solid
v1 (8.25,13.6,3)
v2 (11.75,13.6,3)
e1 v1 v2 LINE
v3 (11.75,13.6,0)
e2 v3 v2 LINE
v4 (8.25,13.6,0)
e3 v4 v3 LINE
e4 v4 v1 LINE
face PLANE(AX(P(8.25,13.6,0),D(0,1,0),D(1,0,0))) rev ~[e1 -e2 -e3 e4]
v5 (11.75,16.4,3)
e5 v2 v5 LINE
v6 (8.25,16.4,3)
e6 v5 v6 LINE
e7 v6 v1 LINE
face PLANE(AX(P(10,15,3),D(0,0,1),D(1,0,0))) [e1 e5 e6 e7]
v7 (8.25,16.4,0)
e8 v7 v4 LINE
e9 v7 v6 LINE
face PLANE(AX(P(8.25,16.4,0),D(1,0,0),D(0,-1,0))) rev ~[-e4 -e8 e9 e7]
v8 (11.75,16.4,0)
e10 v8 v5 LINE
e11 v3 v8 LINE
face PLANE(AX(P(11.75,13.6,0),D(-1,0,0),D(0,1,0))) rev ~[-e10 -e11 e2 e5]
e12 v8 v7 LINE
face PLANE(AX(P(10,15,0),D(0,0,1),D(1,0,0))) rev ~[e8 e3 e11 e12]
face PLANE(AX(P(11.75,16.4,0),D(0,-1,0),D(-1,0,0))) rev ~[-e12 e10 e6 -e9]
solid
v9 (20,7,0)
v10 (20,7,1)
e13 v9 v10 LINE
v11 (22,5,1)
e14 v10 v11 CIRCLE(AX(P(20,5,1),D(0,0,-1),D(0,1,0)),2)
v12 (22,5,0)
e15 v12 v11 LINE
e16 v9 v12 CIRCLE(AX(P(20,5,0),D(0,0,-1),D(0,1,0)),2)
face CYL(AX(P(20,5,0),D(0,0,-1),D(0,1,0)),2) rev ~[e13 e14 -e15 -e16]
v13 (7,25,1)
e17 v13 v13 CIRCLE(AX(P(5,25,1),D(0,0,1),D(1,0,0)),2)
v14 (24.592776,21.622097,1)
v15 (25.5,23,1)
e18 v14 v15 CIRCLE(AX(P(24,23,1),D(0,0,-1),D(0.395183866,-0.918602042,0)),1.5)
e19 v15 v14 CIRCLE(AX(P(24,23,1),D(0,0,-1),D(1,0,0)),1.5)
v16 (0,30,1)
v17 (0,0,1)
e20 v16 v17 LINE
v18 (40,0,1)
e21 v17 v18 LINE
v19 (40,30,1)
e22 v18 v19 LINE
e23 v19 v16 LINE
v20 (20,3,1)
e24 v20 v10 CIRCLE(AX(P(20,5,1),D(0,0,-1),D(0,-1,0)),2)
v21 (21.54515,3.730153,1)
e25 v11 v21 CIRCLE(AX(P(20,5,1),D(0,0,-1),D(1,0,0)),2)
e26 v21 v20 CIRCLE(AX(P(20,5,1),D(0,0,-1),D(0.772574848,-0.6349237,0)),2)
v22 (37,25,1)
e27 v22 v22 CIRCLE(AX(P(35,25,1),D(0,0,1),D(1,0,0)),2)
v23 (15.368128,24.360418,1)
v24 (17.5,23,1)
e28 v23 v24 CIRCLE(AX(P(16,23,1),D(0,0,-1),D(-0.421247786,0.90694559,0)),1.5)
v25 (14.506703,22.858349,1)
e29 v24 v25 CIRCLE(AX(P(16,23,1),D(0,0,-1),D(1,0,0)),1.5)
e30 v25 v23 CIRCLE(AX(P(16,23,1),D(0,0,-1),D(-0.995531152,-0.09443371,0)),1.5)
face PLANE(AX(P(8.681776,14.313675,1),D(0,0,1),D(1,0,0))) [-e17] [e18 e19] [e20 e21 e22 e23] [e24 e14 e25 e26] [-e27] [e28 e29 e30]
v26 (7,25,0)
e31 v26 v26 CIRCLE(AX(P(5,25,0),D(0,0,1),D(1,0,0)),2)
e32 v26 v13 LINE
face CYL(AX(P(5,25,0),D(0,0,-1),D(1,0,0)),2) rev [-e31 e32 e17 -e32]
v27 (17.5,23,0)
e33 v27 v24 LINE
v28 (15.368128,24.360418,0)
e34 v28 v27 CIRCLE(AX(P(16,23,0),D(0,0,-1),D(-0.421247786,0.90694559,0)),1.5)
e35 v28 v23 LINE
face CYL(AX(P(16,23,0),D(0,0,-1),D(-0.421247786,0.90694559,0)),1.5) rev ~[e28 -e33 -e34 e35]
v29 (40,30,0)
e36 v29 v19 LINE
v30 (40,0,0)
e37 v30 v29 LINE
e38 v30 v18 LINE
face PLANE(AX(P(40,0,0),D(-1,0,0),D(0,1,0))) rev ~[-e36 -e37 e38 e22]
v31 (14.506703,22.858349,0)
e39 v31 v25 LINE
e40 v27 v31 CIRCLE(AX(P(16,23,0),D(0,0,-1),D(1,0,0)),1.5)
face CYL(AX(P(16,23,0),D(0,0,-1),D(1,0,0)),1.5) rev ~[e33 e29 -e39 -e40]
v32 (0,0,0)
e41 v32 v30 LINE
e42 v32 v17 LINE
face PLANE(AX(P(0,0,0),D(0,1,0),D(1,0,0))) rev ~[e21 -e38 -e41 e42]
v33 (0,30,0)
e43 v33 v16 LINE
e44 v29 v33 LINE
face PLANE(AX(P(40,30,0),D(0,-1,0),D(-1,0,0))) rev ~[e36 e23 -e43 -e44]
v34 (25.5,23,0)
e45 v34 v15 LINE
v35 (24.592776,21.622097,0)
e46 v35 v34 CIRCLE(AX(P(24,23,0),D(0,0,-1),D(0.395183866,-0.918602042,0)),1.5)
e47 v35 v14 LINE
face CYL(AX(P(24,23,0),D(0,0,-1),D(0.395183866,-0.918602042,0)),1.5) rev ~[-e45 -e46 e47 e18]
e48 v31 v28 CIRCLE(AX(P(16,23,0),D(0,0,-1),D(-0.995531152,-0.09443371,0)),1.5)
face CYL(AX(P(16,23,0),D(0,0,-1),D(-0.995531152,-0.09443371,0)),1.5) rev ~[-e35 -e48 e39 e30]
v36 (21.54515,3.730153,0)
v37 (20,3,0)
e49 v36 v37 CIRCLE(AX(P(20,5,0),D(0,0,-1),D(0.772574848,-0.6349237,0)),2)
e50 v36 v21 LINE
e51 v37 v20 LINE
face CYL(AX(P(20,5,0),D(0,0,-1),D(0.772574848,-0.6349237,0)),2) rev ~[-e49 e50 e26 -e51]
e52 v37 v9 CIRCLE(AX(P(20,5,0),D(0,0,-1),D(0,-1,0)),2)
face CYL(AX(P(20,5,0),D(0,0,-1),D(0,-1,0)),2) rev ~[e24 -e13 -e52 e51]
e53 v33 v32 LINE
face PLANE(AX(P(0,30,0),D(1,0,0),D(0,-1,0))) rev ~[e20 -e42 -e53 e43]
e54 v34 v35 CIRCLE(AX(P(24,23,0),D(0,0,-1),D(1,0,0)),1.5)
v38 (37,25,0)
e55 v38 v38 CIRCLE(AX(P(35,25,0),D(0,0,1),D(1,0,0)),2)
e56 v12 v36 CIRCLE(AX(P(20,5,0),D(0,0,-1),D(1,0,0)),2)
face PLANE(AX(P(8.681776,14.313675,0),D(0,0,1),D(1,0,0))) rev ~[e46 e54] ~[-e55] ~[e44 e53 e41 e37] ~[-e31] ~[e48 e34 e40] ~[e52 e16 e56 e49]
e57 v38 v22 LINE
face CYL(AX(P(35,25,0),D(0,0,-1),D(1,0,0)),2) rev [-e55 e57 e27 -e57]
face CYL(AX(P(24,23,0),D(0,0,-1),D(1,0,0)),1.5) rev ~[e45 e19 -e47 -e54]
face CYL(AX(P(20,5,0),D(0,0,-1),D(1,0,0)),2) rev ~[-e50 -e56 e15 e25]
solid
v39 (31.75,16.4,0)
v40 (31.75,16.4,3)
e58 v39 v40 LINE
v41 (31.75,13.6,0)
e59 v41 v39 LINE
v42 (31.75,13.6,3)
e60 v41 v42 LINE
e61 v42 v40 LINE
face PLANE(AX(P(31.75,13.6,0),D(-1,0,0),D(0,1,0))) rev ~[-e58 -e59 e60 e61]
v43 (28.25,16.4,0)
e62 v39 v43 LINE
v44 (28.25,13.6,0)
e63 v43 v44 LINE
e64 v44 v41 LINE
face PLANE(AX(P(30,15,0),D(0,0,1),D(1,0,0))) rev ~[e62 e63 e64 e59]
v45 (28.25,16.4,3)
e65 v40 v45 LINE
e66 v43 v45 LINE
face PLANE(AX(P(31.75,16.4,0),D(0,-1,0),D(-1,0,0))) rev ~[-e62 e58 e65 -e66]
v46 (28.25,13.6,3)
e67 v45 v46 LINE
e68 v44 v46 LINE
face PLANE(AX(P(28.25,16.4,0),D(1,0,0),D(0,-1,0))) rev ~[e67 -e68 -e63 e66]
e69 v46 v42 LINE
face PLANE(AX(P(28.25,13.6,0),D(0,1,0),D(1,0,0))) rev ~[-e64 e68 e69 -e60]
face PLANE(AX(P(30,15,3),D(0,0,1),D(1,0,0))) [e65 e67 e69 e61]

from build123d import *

# Parameters (mm, degrees)
F0_R     = 2
F1_DEPTH = 1
F2_DEPTH = 3


with BuildPart() as f1:
    # F0 (on Top) → F1 (new body)
    with BuildSketch(Plane.XY):
        with BuildLine():
            Line((0, 30), (0, 0))
            Line((0, 0), (20, 0))
            Line((20, 0), (20, 0.5))
            ThreePointArc((20, 0.5), (15.5, 5), (20, 9.5))
            Line((20, 9.5), (5, 9.5))
            Line((5, 9.5), (5, 20.5))
            Line((5, 20.5), (13.1542079159, 20.5))
            Line((13.1542079159, 20.5), (14.5067032721, 22.8583494358))
            ThreePointArc((14.5067032721, 22.8583494358), (14.6987936477, 23.7462318867), (15.3681283209, 24.3604183846))
            Line((15.3681283209, 24.3604183846), (18.6023852252, 30))
            Line((18.6023852252, 30), (0, 30))
        make_face()
        with BuildLine():
            ThreePointArc((9.5, 25), (8.1819805153, 21.8180194847), (5, 20.5))
            ThreePointArc((5, 20.5), (1.8180194847, 28.1819805153), (9.5, 25))
        make_face(mode=Mode.SUBTRACT)
        Polygon((5, 9.5), (20, 9.5), (20, 20.5), (13.1542079159, 20.5), (5, 20.5), align=None)
        Polygon((8.25, 16.4), (10.8028892877, 16.4), (11.75, 16.4), (11.75, 13.6), (8.25, 13.6), align=None, mode=Mode.SUBTRACT)
        Polygon((27.5459935813, 9.5), (29.8604090717, 0), (40, 0), (40, 9.5), (35, 9.5), align=None)
        Polygon((24.866144066, 20.5), (27.5459935813, 9.5), (35, 9.5), (35, 20.5), (28.6657820621, 20.5), align=None)
        Polygon((28.25, 16.4), (29.6603808885, 16.4), (31.75, 16.4), (31.75, 13.6), (28.25, 13.6), align=None, mode=Mode.SUBTRACT)
        Polygon((26.3612238059, 30), (20, 30), (20, 20.5), (24.866144066, 20.5), (28.6657820621, 20.5), align=None)
        with BuildLine():
            ThreePointArc((25.5, 23), (25.2528295373, 22.1751253729), (24.5927757995, 21.6220969368))
            ThreePointArc((24.5927757995, 21.6220969368), (22.7471704627, 23.8248746271), (25.5, 23))
        make_face(mode=Mode.SUBTRACT)
        Polygon((20, 20.5), (20, 9.5), (27.5459935813, 9.5), (24.866144066, 20.5), align=None)
        with BuildLine():
            ThreePointArc((9.5, 25), (1.8180194847, 28.1819805153), (5, 20.5))
            ThreePointArc((5, 20.5), (8.1819805153, 21.8180194847), (9.5, 25))
        make_face()
        with Locations((5, 25)):
            Circle(F0_R, mode=Mode.SUBTRACT)
        with BuildLine():
            ThreePointArc((39.5, 25), (31.8180194847, 28.1819805153), (35, 20.5))
            ThreePointArc((35, 20.5), (37.8235020538, 21.4960256633), (39.3971016605, 24.0431839323))
            ThreePointArc((39.3971016605, 24.0431839323), (39.4742014635, 24.5188334343), (39.5, 25))
        make_face()
        with Locations((35, 25)):
            Circle(F0_R, mode=Mode.SUBTRACT)
        with BuildLine():
            Line((35, 9.5), (40, 9.5))
            Line((40, 9.5), (40, 23.9542004244))
            Line((40, 23.9542004244), (39.3971016605, 24.0431839323))
            ThreePointArc((39.3971016605, 24.0431839323), (37.8235020538, 21.4960256633), (35, 20.5))
            Line((35, 20.5), (35, 9.5))
        make_face()
        with BuildLine():
            Line((40, 30), (26.3612238059, 30))
            Line((26.3612238059, 30), (28.6657820621, 20.5))
            Line((28.6657820621, 20.5), (35, 20.5))
            ThreePointArc((35, 20.5), (31.8180194847, 28.1819805153), (39.5, 25))
            ThreePointArc((39.5, 25), (39.4742014635, 24.5188334343), (39.3971016605, 24.0431839323))
            Line((39.3971016605, 24.0431839323), (40, 23.9542004244))
            Line((40, 23.9542004244), (40, 30))
        make_face()
        with BuildLine():
            Line((23.4659308964, 2.1299263039), (26.0225208067, 0))
            Line((26.0225208067, 0), (29.8604090717, 0))
            Line((29.8604090717, 0), (27.5459935813, 9.5))
            Line((27.5459935813, 9.5), (20, 9.5))
            ThreePointArc((20, 9.5), (23.1819805153, 8.1819805153), (24.5, 5))
            ThreePointArc((24.5, 5), (24.2335971132, 3.4746621741), (23.4659308964, 2.1299263039))
        make_face()
        with BuildLine():
            Line((20, 30), (18.6023852252, 30))
            Line((18.6023852252, 30), (15.3681283209, 24.3604183846))
            ThreePointArc((15.3681283209, 24.3604183846), (16.806905348, 24.2644776627), (17.5, 23))
            ThreePointArc((17.5, 23), (16.0709045418, 21.5016767552), (14.5067032721, 22.8583494358))
            Line((14.5067032721, 22.8583494358), (13.1542079159, 20.5))
            Line((13.1542079159, 20.5), (20, 20.5))
            Line((20, 20.5), (20, 30))
        make_face()
        with BuildLine():
            ThreePointArc((20, 9.5), (15.5, 5), (20, 0.5))
            Line((20, 0.5), (20, 3))
            ThreePointArc((20, 3), (18, 5), (20, 7))
            Line((20, 7), (20, 9.5))
        make_face()
        with BuildLine():
            Line((21.5451496956, 3.7301526004), (23.4659308964, 2.1299263039))
            ThreePointArc((23.4659308964, 2.1299263039), (24.2335971132, 3.4746621741), (24.5, 5))
            ThreePointArc((24.5, 5), (23.1819805153, 8.1819805153), (20, 9.5))
            Line((20, 9.5), (20, 7))
            ThreePointArc((20, 7), (21.4142135624, 6.4142135624), (22, 5))
            ThreePointArc((22, 5), (21.882856791, 4.3255740927), (21.5451496956, 3.7301526004))
        make_face()
        Polygon((11.75, 16.4), (10.8028892877, 16.4), (8.25, 16.4), (8.25, 13.6), (11.75, 13.6), align=None)
        Polygon((31.75, 16.4), (29.6603808885, 16.4), (28.25, 16.4), (28.25, 13.6), (31.75, 13.6), align=None)
        with BuildLine():
            Line((20, 3), (20, 0.5))
            ThreePointArc((20, 0.5), (21.9150285073, 0.9278180522), (23.4659308964, 2.1299263039))
            Line((23.4659308964, 2.1299263039), (21.5451496956, 3.7301526004))
            ThreePointArc((21.5451496956, 3.7301526004), (20.8544896725, 3.1917280626), (20, 3))
        make_face()
        with BuildLine():
            Line((20, 0.5), (20, 0))
            Line((20, 0), (26.0225208067, 0))
            Line((26.0225208067, 0), (23.4659308964, 2.1299263039))
            ThreePointArc((23.4659308964, 2.1299263039), (21.9150285073, 0.9278180522), (20, 0.5))
        make_face()
    extrude(amount=F1_DEPTH)


with BuildPart() as f2:
    # F0 (on Top) → F2 (new body)
    with BuildSketch(Plane.XY):
        Polygon((31.75, 16.4), (29.6603808885, 16.4), (28.25, 16.4), (28.25, 13.6), (31.75, 13.6), align=None)
    extrude(amount=F2_DEPTH)


with BuildPart() as f2b:
    # F0 (on Top) → F2, piece 2 (new body)
    with BuildSketch(Plane.XY):
        Polygon((11.75, 16.4), (10.8028892877, 16.4), (8.25, 16.4), (8.25, 13.6), (11.75, 13.6), align=None)
    extrude(amount=F2_DEPTH)


solid = Compound([f1.part, f2.part, f2b.part])
